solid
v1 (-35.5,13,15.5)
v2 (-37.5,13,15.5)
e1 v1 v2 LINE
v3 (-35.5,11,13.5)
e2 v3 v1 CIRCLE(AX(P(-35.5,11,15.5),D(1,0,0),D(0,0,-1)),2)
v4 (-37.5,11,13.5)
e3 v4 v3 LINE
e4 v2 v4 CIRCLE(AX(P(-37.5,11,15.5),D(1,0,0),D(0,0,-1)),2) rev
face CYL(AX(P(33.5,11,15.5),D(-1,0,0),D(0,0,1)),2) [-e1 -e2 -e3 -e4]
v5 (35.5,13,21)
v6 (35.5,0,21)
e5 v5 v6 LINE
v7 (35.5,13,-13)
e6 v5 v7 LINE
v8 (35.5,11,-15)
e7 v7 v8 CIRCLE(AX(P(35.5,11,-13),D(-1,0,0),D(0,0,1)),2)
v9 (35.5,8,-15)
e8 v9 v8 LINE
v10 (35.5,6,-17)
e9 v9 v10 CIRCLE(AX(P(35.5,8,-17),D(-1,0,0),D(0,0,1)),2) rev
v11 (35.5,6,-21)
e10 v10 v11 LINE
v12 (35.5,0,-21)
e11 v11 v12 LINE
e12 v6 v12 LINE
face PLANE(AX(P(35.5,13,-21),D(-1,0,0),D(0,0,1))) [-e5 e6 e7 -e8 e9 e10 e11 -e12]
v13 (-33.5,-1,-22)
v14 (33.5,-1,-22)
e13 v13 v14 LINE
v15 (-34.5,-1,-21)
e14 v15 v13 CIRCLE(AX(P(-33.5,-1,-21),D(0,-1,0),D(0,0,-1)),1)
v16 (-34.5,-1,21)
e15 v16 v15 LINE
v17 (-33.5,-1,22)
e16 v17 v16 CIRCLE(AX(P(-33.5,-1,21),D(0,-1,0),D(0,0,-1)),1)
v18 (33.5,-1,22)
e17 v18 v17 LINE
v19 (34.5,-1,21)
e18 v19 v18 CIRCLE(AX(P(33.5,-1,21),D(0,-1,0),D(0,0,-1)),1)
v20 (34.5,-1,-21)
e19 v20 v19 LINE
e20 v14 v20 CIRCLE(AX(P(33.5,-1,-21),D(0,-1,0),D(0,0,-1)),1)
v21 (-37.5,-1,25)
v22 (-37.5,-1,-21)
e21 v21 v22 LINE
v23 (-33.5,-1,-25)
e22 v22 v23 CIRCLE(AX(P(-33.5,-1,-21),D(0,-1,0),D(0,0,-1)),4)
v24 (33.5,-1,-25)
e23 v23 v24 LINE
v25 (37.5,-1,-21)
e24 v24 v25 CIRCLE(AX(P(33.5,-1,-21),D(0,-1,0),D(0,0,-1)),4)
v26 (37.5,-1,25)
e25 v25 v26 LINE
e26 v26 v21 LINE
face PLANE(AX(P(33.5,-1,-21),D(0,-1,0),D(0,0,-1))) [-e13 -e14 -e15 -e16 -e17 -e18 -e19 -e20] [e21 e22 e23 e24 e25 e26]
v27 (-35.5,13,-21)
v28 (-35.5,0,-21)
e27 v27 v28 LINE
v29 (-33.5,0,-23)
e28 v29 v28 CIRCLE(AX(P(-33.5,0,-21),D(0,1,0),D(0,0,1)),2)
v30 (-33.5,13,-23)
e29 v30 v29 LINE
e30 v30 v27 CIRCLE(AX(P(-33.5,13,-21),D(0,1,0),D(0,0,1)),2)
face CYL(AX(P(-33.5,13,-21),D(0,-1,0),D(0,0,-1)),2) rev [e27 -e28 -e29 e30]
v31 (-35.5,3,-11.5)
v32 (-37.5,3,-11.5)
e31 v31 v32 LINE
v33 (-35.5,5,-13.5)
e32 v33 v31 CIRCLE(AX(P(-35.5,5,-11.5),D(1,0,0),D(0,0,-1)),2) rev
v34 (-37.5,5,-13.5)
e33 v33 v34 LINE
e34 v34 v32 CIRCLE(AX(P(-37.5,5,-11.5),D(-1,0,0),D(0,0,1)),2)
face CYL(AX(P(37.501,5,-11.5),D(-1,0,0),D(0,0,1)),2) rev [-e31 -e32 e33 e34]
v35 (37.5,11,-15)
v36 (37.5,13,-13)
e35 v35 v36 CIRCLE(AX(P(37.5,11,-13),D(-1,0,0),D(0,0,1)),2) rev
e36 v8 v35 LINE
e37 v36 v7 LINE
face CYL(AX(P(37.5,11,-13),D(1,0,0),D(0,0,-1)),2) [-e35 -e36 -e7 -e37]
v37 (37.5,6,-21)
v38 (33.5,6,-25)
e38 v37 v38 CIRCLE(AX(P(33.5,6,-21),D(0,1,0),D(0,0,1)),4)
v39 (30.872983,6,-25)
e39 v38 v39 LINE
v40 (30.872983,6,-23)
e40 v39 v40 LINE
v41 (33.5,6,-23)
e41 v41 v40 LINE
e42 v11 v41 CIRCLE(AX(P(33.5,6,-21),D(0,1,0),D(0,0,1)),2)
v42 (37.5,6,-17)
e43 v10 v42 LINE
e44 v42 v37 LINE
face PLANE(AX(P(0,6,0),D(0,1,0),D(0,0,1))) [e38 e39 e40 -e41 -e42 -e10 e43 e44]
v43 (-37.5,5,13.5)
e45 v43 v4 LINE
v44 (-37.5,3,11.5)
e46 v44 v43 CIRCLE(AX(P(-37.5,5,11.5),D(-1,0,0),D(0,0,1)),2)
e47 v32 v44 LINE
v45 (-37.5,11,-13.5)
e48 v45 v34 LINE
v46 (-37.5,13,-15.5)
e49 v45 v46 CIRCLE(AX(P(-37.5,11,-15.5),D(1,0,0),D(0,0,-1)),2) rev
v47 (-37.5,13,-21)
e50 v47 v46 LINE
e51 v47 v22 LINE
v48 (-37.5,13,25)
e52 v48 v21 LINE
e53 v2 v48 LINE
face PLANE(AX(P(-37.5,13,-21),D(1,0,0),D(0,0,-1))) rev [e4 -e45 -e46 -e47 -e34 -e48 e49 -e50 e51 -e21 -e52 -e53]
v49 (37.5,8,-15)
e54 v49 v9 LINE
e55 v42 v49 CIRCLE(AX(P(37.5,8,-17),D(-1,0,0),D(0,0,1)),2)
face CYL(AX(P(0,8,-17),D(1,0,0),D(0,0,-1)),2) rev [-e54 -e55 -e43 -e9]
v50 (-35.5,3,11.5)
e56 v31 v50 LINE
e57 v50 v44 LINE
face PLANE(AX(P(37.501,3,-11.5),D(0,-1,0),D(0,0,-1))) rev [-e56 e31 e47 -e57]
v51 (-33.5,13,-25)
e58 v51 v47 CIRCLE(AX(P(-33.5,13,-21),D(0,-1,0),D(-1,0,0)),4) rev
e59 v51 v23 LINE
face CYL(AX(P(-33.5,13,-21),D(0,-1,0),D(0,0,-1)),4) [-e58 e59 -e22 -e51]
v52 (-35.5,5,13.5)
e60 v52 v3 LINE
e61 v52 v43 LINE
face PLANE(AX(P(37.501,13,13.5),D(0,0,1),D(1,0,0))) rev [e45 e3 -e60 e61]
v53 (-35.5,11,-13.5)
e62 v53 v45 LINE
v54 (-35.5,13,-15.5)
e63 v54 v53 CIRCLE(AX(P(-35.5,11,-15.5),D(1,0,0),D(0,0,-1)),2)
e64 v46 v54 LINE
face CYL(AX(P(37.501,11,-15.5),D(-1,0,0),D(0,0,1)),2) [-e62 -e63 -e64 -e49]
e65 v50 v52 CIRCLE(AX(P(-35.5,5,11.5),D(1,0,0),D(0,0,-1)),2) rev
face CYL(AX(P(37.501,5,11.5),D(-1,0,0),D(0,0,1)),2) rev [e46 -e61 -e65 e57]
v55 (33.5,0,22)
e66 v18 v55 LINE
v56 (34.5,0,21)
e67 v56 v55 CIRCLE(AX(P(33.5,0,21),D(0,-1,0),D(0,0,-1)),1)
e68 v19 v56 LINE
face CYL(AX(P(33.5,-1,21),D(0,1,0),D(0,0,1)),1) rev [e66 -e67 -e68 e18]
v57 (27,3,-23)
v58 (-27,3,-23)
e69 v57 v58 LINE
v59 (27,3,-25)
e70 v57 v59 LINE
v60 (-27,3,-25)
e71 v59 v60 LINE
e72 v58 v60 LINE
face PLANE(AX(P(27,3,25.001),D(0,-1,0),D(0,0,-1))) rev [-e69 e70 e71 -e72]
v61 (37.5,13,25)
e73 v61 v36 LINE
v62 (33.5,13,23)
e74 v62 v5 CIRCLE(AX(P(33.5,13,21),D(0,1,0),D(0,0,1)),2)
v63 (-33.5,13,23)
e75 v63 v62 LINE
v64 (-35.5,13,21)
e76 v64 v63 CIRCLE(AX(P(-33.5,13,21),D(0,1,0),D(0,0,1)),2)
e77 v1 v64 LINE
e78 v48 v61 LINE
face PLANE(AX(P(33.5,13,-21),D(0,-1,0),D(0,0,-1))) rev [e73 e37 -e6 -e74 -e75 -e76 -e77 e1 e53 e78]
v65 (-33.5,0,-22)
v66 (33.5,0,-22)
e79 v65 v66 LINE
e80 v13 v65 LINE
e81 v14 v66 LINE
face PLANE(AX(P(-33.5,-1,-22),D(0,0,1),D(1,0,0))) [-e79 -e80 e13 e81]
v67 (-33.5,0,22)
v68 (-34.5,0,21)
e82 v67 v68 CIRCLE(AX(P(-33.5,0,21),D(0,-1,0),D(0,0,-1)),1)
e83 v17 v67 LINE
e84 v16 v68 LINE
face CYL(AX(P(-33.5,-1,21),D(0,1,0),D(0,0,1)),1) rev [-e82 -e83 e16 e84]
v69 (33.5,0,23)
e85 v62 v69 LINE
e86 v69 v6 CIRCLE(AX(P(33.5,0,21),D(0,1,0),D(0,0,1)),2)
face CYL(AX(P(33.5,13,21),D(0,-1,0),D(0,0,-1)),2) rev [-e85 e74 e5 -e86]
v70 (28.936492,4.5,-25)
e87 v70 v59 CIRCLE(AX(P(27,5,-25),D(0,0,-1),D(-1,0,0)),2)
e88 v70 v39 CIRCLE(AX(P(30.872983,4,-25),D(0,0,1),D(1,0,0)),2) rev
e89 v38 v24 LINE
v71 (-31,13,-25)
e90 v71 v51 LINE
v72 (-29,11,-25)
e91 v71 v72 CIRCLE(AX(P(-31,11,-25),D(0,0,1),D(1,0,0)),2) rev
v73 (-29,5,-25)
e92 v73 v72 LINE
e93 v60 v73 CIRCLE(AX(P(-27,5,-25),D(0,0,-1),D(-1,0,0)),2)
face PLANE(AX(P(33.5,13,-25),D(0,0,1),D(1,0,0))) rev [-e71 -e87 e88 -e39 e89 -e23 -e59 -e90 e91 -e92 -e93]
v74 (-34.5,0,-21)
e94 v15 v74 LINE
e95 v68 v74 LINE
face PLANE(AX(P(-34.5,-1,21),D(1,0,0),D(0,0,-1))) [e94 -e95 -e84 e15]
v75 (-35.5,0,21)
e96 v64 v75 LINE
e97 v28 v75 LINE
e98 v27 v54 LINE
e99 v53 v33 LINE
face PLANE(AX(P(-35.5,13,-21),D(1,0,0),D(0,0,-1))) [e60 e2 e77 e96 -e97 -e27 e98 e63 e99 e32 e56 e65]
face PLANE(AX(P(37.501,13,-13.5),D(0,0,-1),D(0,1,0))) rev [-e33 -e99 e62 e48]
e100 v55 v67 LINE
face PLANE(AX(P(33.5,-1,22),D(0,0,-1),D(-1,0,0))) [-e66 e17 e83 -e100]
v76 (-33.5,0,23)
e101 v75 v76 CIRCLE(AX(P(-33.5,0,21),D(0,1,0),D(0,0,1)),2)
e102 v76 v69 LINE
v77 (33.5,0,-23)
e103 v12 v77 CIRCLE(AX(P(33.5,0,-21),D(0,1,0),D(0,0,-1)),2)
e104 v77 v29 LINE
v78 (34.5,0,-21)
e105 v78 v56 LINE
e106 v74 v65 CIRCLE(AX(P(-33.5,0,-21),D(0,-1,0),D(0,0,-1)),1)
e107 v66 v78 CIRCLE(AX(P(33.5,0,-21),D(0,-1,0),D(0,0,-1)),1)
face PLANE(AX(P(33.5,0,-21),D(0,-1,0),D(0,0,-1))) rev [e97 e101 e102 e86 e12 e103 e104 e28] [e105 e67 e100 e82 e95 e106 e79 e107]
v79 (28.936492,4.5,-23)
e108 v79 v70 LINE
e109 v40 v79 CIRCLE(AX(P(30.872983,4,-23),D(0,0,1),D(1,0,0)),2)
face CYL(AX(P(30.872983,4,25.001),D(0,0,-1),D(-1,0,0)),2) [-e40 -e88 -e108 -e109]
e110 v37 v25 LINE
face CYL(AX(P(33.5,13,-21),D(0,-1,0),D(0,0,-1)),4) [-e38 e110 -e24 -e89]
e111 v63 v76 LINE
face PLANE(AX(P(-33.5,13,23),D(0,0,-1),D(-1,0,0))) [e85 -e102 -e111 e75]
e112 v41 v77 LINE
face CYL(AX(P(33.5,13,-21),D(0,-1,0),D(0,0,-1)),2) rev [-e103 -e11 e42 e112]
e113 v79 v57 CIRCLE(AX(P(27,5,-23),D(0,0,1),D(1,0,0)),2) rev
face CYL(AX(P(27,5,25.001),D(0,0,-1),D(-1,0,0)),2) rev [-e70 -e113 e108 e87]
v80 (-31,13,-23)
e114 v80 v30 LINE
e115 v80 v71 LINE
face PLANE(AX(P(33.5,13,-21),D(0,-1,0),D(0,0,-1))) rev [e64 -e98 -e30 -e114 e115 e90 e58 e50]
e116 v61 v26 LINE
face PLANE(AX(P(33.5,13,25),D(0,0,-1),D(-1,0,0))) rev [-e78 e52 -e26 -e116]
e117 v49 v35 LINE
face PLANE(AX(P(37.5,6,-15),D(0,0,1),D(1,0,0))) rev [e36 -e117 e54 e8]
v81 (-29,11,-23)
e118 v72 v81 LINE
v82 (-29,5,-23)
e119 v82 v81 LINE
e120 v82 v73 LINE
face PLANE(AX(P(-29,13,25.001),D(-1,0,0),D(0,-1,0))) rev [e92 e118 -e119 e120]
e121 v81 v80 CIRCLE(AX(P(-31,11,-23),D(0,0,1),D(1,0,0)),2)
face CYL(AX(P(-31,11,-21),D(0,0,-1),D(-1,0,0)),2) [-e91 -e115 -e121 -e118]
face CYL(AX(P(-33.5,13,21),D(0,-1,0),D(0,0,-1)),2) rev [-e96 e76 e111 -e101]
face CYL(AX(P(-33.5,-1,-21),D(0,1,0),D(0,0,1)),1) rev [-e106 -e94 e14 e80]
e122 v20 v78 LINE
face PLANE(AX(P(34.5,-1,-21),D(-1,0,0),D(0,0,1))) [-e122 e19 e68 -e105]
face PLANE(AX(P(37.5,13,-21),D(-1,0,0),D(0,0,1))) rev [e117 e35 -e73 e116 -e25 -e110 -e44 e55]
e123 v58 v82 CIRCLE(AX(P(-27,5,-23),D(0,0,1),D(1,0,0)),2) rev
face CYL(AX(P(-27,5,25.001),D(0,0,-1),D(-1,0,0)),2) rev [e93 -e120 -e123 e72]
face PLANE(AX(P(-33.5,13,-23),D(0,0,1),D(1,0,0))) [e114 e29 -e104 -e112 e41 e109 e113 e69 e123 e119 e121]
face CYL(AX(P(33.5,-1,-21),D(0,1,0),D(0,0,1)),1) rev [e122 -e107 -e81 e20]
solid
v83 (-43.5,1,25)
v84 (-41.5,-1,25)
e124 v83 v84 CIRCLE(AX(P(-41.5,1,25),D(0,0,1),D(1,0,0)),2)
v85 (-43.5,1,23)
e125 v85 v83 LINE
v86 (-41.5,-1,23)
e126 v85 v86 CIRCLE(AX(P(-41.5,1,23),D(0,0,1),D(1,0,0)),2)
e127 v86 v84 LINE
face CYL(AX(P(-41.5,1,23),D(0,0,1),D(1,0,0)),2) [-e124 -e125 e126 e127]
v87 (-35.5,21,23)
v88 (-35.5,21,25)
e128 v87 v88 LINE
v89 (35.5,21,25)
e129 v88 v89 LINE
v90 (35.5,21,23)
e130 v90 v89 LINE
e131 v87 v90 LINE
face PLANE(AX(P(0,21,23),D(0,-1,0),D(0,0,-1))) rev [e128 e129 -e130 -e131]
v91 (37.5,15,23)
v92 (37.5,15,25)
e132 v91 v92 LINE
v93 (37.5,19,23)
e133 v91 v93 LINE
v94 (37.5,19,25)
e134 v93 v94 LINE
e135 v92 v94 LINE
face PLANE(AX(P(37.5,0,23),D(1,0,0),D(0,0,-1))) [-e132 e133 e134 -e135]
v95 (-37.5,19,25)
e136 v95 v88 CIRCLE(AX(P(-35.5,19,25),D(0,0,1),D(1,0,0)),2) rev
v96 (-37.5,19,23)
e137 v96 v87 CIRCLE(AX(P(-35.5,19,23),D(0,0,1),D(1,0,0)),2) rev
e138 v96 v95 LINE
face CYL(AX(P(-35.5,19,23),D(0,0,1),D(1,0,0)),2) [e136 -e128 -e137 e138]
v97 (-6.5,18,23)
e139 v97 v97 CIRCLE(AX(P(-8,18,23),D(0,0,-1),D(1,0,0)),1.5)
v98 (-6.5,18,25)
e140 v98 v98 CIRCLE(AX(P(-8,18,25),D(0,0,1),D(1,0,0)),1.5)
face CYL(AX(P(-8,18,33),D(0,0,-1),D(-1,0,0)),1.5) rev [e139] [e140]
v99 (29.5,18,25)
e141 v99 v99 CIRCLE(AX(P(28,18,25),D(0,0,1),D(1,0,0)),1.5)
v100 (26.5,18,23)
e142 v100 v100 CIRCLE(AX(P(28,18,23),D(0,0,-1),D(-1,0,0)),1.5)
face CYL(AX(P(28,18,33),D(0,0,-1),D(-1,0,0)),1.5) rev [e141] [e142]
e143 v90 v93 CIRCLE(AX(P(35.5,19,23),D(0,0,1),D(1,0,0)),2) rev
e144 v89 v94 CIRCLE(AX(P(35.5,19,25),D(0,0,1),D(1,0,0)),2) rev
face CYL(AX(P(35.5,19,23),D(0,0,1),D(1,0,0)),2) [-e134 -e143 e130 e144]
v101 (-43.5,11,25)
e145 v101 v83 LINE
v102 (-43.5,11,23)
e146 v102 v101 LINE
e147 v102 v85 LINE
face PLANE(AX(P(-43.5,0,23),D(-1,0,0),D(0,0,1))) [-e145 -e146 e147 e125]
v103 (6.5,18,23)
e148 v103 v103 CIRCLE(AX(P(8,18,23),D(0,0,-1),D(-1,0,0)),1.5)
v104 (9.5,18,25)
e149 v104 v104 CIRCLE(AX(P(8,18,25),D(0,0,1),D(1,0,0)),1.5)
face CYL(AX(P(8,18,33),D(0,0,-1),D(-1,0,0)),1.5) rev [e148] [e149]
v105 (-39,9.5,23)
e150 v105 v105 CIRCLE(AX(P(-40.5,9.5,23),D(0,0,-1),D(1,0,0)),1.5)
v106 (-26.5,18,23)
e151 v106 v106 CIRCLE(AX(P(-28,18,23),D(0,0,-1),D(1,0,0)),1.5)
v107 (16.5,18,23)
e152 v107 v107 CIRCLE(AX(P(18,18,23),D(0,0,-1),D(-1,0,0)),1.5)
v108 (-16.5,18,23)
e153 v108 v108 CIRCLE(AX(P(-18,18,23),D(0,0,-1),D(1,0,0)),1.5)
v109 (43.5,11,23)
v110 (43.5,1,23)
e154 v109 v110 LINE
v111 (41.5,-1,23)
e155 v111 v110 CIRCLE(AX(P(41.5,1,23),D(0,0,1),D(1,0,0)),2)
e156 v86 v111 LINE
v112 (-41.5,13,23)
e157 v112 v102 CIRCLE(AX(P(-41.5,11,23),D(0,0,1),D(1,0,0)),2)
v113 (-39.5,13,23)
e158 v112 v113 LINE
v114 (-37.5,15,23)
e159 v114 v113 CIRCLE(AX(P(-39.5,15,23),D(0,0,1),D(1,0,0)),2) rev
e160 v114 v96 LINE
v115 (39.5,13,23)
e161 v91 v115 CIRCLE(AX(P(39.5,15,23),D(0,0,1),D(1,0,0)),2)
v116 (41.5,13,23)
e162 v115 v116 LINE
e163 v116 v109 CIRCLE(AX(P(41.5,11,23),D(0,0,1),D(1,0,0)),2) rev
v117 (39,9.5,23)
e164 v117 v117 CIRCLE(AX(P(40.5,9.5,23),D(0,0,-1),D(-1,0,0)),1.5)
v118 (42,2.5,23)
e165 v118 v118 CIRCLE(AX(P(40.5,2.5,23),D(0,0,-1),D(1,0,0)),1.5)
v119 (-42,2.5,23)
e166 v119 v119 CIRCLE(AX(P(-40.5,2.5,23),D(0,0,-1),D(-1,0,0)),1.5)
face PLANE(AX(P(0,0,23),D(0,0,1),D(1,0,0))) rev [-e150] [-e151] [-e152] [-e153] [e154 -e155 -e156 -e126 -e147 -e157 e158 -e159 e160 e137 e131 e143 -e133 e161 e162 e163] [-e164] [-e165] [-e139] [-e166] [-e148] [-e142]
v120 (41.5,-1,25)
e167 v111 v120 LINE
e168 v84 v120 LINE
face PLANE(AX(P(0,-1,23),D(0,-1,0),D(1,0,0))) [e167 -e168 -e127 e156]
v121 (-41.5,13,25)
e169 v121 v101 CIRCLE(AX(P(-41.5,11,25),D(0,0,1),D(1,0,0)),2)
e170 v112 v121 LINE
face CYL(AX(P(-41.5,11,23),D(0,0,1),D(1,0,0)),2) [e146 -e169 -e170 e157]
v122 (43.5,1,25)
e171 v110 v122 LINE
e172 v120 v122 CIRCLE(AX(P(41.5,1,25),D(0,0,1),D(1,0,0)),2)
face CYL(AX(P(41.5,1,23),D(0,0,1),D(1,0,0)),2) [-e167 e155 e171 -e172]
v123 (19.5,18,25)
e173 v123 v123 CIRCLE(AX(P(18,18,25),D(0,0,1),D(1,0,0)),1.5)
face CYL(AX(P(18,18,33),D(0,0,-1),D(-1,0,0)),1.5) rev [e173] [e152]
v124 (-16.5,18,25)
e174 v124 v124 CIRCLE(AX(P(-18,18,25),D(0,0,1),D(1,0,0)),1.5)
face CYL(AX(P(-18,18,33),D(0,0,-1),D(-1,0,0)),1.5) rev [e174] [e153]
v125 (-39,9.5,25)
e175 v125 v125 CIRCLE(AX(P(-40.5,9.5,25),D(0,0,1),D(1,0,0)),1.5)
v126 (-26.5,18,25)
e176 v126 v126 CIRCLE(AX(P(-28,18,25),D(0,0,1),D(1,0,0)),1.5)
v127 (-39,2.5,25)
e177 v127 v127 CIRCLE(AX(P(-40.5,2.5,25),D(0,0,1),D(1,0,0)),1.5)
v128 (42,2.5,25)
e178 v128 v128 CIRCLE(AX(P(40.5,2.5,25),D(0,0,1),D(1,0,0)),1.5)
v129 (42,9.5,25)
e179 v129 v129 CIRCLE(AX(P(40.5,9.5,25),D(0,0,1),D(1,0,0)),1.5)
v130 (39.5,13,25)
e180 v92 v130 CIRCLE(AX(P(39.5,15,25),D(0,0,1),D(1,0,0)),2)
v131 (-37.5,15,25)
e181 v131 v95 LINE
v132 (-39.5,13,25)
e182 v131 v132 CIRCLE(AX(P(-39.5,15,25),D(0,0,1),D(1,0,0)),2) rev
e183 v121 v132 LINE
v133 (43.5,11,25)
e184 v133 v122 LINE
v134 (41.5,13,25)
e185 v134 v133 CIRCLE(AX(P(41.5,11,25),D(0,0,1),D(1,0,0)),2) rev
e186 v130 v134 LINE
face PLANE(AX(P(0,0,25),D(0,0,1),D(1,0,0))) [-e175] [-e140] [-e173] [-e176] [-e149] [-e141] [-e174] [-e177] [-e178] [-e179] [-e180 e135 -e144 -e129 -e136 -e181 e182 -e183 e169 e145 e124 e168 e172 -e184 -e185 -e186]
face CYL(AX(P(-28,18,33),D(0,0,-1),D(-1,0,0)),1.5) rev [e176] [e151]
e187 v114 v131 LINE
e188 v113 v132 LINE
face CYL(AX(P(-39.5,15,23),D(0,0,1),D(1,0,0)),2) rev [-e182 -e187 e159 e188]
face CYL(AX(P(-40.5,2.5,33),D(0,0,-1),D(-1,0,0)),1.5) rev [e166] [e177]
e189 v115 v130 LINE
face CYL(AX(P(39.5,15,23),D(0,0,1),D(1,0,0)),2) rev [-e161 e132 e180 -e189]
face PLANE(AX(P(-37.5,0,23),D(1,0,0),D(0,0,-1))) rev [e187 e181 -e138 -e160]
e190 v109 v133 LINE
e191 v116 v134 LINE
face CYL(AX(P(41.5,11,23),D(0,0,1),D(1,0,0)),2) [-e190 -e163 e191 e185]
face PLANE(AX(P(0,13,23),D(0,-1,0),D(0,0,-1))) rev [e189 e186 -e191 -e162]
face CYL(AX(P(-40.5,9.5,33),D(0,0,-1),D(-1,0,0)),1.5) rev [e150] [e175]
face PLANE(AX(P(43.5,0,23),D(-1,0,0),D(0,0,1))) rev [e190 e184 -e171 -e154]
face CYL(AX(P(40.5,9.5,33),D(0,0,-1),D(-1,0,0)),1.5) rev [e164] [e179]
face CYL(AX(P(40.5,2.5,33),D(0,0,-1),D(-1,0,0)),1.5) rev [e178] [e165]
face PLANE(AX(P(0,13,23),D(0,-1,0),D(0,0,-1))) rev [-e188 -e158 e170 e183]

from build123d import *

# Parameters (mm, degrees)
EXTRUDE_THIN1_DEPTH = 13
CUT_EXTRUDE1_REACH  = 65.838
BOSS_EXTRUDE2_START = 1
BOSS_EXTRUDE2_DEPTH = 1
CUT_EXTRUDE2_REACH  = 82.119
SKETCH5_W           = 8.5
SKETCH5_H           = 10
CUT_EXTRUDE3_DEPTH  = 7
FILLET1_R           = 2
DELETEFACE1_START   = -1
DELETEFACE1_DEPTH   = 14
SKETCH7_W           = 75
SKETCH7_H           = 14
BOSS_EXTRUDE3_DEPTH = 2
SKETCH8_R           = 1.5
CUT_EXTRUDE4_DEPTH  = 10


# Read off the part's stored shape, not the designer's step: DeleteFace1
with BuildPart() as part:
    # Sketch1 → Extrude-Thin1 (new body)
    with BuildSketch(Plane(origin=(0, 0, 0), x_dir=(1, 0, 0), z_dir=(0, 1, 0))):
        with BuildLine():
            Line((33.5, -25), (-33.5, -25))
            ThreePointArc((-33.5, -25), (-36.328427125, -23.828427125), (-37.5, -21))
            Line((-37.5, -21), (-37.5, 21))
            ThreePointArc((-37.5, 21), (-36.328427125, 23.828427125), (-33.5, 25))
            Line((-33.5, 25), (33.5, 25))
            ThreePointArc((33.5, 25), (36.328427125, 23.828427125), (37.5, 21))
            Line((37.5, 21), (37.5, -21))
            ThreePointArc((37.5, -21), (36.328427125, -23.828427125), (33.5, -25))
        make_face()
        with BuildLine():
            Line((33.5, -23), (-33.5, -23))
            ThreePointArc((-33.5, -23), (-34.914213562, -22.414213562), (-35.5, -21))
            Line((-35.5, -21), (-35.5, 21))
            ThreePointArc((-35.5, 21), (-34.914213562, 22.414213562), (-33.5, 23))
            Line((-33.5, 23), (33.5, 23))
            ThreePointArc((33.5, 23), (34.914213562, 22.414213562), (35.5, 21))
            Line((35.5, 21), (35.5, -21))
            ThreePointArc((35.5, -21), (34.914213562, -22.414213562), (33.5, -23))
        make_face(mode=Mode.SUBTRACT)
    extrude(amount=EXTRUDE_THIN1_DEPTH)

    # Sketch2 → Cut-Extrude1 (cut, up to next)
    with BuildSketch(Plane(origin=(0, 0, -25), x_dir=(-1, 0, 0), z_dir=(0, 0, -1)), mode=Mode.PRIVATE) as cut_extrude1_sk1:
        with BuildLine():
            Line((-29, 13), (29, 13))
            Line((29, 13), (29, 5))
            ThreePointArc((29, 5), (28.414213562, 3.585786438), (27, 3))
            Line((27, 3), (-27, 3))
            ThreePointArc((-27, 3), (-28.414213562, 3.585786438), (-29, 5))
            Line((-29, 5), (-29, 13))
        make_face()
    cut_extrude1_tool1 = extrude(cut_extrude1_sk1.sketch, amount=-CUT_EXTRUDE1_REACH, mode=Mode.PRIVATE) & part.part
    add(cut_extrude1_tool1.solids().sort_by_distance((0, 8.013518, -25))[0], mode=Mode.SUBTRACT)

    # Sketch3 → Boss-Extrude2 (add)
    with BuildSketch(Plane.XZ.offset(BOSS_EXTRUDE2_START)):
        with BuildLine():
            Line((37.5, -21), (37.5, 21))
            ThreePointArc((37.5, 21), (36.328427125, 23.828427125), (33.5, 25))
            Line((33.5, 25), (-33.5, 25))
            ThreePointArc((-33.5, 25), (-36.328427125, 23.828427125), (-37.5, 21))
            Line((-37.5, 21), (-37.5, -21))
            ThreePointArc((-37.5, -21), (-36.328427125, -23.828427125), (-33.5, -25))
            Line((-33.5, -25), (33.5, -25))
            ThreePointArc((33.5, -25), (36.328427125, -23.828427125), (37.5, -21))
        make_face()
        with BuildLine():
            Line((34.5, -21), (34.5, 21))
            ThreePointArc((34.5, 21), (34.207106781, 21.707106781), (33.5, 22))
            Line((33.5, 22), (-33.5, 22))
            ThreePointArc((-33.5, 22), (-34.207106781, 21.707106781), (-34.5, 21))
            Line((-34.5, 21), (-34.5, -21))
            ThreePointArc((-34.5, -21), (-34.207106781, -21.707106781), (-33.5, -22))
            Line((-33.5, -22), (33.5, -22))
            ThreePointArc((33.5, -22), (34.207106781, -21.707106781), (34.5, -21))
        make_face(mode=Mode.SUBTRACT)
    extrude(amount=-BOSS_EXTRUDE2_DEPTH)

    # Sketch4 → Cut-Extrude2 (cut, up to next)
    with BuildSketch(Plane.ZY.offset(37.5), mode=Mode.PRIVATE) as cut_extrude2_sk1:
        with BuildLine():
            Line((-13.5, 13), (13.5, 13))
            Line((13.5, 13), (13.5, 5))
            ThreePointArc((13.5, 5), (12.914213562, 3.585786438), (11.5, 3))
            Line((11.5, 3), (-11.5, 3))
            ThreePointArc((-11.5, 3), (-12.914213562, 3.585786438), (-13.5, 5))
            Line((-13.5, 5), (-13.5, 13))
        make_face()
    cut_extrude2_tool1 = extrude(cut_extrude2_sk1.sketch, amount=-CUT_EXTRUDE2_REACH, mode=Mode.PRIVATE) & part.part
    add(cut_extrude2_tool1.solids().sort_by_distance((-37.5, 8.029138, 0))[0], mode=Mode.SUBTRACT)

    # Sketch5 → Cut-Extrude3 (cut)
    with BuildSketch(Plane(origin=(0, 13, 0), x_dir=(1, 0, 0), z_dir=(0, 1, 0))):
        with Locations((33.25, 20)):
            Rectangle(SKETCH5_W, SKETCH5_H)
    extrude(amount=-CUT_EXTRUDE3_DEPTH, mode=Mode.SUBTRACT)

    # Fillet1
    fillet1_edges = [part.edges().sort_by_distance(p)[0] for p in [
        (-29, 13, -24),
        (29, 6, -24),
        (-36.5, 13, 13.5),
        (-36.5, 13, -13.5),
        (36.5, 6, -15),
        (36.5, 13, -15),
    ]]
    fillet(fillet1_edges, radius=FILLET1_R)

    # DeleteFace1 outline → DeleteFace1 (add)
    with BuildSketch(Plane(origin=(0, 0, 0), x_dir=(1, 0, 0), z_dir=(0, 1, 0)).offset(DELETEFACE1_START)):
        with BuildLine():
            Line((-37.5, -25), (-33.5, -25))
            ThreePointArc((-33.5, -25), (-36.328427125, -23.828427125), (-37.5, -21))
            Line((-37.5, -21), (-37.5, -25))
        make_face()
        with BuildLine():
            ThreePointArc((37.5, -21), (36.328427125, -23.828427125), (33.5, -25))
            Line((33.5, -25), (37.5, -25))
            Line((37.5, -25), (37.5, -21))
        make_face()
    extrude(amount=DELETEFACE1_DEPTH)


with BuildPart() as body_2:
    # Sketch7 → Boss-Extrude3 (new body)
    with BuildSketch(Plane.XY.offset(25)):
        with BuildLine():
            Line((-39.5, 13), (-41.5, 13))
            ThreePointArc((-41.5, 13), (-42.914213562, 12.414213562), (-43.5, 11))
            Line((-43.5, 11), (-43.5, 1))
            ThreePointArc((-43.5, 1), (-42.914213562, -0.414213562), (-41.5, -1))
            Line((-41.5, -1), (-37.5, -1))
            Line((-37.5, -1), (-37.5, 13))
            Line((-37.5, 13), (0, 13))
            Line((0, 13), (37.5, 13))
            Line((37.5, 13), (39.5, 13))
            ThreePointArc((39.5, 13), (38.085786438, 13.585786438), (37.5, 15))
            Line((37.5, 15), (37.5, 19))
            ThreePointArc((37.5, 19), (36.914213562, 20.414213562), (35.5, 21))
            Line((35.5, 21), (-35.5, 21))
            ThreePointArc((-35.5, 21), (-36.914213562, 20.414213562), (-37.5, 19))
            Line((-37.5, 19), (-37.5, 15))
            ThreePointArc((-37.5, 15), (-38.085786438, 13.585786438), (-39.5, 13))
        make_face()
        with Locations((0, 6)):
            Rectangle(SKETCH7_W, SKETCH7_H)
        with BuildLine():
            Line((37.5, 13), (37.5, -1))
            Line((37.5, -1), (41.5, -1))
            ThreePointArc((41.5, -1), (42.914213562, -0.414213562), (43.5, 1))
            Line((43.5, 1), (43.5, 11))
            ThreePointArc((43.5, 11), (42.914213562, 12.414213562), (41.5, 13))
            Line((41.5, 13), (39.5, 13))
            Line((39.5, 13), (37.5, 13))
        make_face()
    extrude(amount=-BOSS_EXTRUDE3_DEPTH)

    # Sketch8 → Cut-Extrude4 (cut)
    with BuildSketch(Plane(origin=(0, 0, 23), x_dir=(-1, 0, 0), z_dir=(0, 0, -1))):
        with Locations((-40.5, 9.5)):
            Circle(SKETCH8_R)
        with Locations(Location((-40.5, 2.5, 0), (0, 0, 180))):
            Circle(SKETCH8_R)
        with Locations(Location((40.5, 9.5, 0), (0, 0, 180))):
            Circle(SKETCH8_R)
        with Locations((40.5, 2.5)):
            Circle(SKETCH8_R)
        with Locations(Location((8, 18, 0), (0, 0, 180))):
            Circle(SKETCH8_R)
        with Locations(Location((18, 18, 0), (0, 0, 180))):
            Circle(SKETCH8_R)
        with Locations((-8, 18)):
            Circle(SKETCH8_R)
        with Locations((-18, 18)):
            Circle(SKETCH8_R)
        with Locations((-28, 18)):
            Circle(SKETCH8_R)
        with Locations(Location((28, 18, 0), (0, 0, 180))):
            Circle(SKETCH8_R)
    extrude(amount=-CUT_EXTRUDE4_DEPTH, mode=Mode.SUBTRACT)


solid = Compound([part.part, body_2.part])
